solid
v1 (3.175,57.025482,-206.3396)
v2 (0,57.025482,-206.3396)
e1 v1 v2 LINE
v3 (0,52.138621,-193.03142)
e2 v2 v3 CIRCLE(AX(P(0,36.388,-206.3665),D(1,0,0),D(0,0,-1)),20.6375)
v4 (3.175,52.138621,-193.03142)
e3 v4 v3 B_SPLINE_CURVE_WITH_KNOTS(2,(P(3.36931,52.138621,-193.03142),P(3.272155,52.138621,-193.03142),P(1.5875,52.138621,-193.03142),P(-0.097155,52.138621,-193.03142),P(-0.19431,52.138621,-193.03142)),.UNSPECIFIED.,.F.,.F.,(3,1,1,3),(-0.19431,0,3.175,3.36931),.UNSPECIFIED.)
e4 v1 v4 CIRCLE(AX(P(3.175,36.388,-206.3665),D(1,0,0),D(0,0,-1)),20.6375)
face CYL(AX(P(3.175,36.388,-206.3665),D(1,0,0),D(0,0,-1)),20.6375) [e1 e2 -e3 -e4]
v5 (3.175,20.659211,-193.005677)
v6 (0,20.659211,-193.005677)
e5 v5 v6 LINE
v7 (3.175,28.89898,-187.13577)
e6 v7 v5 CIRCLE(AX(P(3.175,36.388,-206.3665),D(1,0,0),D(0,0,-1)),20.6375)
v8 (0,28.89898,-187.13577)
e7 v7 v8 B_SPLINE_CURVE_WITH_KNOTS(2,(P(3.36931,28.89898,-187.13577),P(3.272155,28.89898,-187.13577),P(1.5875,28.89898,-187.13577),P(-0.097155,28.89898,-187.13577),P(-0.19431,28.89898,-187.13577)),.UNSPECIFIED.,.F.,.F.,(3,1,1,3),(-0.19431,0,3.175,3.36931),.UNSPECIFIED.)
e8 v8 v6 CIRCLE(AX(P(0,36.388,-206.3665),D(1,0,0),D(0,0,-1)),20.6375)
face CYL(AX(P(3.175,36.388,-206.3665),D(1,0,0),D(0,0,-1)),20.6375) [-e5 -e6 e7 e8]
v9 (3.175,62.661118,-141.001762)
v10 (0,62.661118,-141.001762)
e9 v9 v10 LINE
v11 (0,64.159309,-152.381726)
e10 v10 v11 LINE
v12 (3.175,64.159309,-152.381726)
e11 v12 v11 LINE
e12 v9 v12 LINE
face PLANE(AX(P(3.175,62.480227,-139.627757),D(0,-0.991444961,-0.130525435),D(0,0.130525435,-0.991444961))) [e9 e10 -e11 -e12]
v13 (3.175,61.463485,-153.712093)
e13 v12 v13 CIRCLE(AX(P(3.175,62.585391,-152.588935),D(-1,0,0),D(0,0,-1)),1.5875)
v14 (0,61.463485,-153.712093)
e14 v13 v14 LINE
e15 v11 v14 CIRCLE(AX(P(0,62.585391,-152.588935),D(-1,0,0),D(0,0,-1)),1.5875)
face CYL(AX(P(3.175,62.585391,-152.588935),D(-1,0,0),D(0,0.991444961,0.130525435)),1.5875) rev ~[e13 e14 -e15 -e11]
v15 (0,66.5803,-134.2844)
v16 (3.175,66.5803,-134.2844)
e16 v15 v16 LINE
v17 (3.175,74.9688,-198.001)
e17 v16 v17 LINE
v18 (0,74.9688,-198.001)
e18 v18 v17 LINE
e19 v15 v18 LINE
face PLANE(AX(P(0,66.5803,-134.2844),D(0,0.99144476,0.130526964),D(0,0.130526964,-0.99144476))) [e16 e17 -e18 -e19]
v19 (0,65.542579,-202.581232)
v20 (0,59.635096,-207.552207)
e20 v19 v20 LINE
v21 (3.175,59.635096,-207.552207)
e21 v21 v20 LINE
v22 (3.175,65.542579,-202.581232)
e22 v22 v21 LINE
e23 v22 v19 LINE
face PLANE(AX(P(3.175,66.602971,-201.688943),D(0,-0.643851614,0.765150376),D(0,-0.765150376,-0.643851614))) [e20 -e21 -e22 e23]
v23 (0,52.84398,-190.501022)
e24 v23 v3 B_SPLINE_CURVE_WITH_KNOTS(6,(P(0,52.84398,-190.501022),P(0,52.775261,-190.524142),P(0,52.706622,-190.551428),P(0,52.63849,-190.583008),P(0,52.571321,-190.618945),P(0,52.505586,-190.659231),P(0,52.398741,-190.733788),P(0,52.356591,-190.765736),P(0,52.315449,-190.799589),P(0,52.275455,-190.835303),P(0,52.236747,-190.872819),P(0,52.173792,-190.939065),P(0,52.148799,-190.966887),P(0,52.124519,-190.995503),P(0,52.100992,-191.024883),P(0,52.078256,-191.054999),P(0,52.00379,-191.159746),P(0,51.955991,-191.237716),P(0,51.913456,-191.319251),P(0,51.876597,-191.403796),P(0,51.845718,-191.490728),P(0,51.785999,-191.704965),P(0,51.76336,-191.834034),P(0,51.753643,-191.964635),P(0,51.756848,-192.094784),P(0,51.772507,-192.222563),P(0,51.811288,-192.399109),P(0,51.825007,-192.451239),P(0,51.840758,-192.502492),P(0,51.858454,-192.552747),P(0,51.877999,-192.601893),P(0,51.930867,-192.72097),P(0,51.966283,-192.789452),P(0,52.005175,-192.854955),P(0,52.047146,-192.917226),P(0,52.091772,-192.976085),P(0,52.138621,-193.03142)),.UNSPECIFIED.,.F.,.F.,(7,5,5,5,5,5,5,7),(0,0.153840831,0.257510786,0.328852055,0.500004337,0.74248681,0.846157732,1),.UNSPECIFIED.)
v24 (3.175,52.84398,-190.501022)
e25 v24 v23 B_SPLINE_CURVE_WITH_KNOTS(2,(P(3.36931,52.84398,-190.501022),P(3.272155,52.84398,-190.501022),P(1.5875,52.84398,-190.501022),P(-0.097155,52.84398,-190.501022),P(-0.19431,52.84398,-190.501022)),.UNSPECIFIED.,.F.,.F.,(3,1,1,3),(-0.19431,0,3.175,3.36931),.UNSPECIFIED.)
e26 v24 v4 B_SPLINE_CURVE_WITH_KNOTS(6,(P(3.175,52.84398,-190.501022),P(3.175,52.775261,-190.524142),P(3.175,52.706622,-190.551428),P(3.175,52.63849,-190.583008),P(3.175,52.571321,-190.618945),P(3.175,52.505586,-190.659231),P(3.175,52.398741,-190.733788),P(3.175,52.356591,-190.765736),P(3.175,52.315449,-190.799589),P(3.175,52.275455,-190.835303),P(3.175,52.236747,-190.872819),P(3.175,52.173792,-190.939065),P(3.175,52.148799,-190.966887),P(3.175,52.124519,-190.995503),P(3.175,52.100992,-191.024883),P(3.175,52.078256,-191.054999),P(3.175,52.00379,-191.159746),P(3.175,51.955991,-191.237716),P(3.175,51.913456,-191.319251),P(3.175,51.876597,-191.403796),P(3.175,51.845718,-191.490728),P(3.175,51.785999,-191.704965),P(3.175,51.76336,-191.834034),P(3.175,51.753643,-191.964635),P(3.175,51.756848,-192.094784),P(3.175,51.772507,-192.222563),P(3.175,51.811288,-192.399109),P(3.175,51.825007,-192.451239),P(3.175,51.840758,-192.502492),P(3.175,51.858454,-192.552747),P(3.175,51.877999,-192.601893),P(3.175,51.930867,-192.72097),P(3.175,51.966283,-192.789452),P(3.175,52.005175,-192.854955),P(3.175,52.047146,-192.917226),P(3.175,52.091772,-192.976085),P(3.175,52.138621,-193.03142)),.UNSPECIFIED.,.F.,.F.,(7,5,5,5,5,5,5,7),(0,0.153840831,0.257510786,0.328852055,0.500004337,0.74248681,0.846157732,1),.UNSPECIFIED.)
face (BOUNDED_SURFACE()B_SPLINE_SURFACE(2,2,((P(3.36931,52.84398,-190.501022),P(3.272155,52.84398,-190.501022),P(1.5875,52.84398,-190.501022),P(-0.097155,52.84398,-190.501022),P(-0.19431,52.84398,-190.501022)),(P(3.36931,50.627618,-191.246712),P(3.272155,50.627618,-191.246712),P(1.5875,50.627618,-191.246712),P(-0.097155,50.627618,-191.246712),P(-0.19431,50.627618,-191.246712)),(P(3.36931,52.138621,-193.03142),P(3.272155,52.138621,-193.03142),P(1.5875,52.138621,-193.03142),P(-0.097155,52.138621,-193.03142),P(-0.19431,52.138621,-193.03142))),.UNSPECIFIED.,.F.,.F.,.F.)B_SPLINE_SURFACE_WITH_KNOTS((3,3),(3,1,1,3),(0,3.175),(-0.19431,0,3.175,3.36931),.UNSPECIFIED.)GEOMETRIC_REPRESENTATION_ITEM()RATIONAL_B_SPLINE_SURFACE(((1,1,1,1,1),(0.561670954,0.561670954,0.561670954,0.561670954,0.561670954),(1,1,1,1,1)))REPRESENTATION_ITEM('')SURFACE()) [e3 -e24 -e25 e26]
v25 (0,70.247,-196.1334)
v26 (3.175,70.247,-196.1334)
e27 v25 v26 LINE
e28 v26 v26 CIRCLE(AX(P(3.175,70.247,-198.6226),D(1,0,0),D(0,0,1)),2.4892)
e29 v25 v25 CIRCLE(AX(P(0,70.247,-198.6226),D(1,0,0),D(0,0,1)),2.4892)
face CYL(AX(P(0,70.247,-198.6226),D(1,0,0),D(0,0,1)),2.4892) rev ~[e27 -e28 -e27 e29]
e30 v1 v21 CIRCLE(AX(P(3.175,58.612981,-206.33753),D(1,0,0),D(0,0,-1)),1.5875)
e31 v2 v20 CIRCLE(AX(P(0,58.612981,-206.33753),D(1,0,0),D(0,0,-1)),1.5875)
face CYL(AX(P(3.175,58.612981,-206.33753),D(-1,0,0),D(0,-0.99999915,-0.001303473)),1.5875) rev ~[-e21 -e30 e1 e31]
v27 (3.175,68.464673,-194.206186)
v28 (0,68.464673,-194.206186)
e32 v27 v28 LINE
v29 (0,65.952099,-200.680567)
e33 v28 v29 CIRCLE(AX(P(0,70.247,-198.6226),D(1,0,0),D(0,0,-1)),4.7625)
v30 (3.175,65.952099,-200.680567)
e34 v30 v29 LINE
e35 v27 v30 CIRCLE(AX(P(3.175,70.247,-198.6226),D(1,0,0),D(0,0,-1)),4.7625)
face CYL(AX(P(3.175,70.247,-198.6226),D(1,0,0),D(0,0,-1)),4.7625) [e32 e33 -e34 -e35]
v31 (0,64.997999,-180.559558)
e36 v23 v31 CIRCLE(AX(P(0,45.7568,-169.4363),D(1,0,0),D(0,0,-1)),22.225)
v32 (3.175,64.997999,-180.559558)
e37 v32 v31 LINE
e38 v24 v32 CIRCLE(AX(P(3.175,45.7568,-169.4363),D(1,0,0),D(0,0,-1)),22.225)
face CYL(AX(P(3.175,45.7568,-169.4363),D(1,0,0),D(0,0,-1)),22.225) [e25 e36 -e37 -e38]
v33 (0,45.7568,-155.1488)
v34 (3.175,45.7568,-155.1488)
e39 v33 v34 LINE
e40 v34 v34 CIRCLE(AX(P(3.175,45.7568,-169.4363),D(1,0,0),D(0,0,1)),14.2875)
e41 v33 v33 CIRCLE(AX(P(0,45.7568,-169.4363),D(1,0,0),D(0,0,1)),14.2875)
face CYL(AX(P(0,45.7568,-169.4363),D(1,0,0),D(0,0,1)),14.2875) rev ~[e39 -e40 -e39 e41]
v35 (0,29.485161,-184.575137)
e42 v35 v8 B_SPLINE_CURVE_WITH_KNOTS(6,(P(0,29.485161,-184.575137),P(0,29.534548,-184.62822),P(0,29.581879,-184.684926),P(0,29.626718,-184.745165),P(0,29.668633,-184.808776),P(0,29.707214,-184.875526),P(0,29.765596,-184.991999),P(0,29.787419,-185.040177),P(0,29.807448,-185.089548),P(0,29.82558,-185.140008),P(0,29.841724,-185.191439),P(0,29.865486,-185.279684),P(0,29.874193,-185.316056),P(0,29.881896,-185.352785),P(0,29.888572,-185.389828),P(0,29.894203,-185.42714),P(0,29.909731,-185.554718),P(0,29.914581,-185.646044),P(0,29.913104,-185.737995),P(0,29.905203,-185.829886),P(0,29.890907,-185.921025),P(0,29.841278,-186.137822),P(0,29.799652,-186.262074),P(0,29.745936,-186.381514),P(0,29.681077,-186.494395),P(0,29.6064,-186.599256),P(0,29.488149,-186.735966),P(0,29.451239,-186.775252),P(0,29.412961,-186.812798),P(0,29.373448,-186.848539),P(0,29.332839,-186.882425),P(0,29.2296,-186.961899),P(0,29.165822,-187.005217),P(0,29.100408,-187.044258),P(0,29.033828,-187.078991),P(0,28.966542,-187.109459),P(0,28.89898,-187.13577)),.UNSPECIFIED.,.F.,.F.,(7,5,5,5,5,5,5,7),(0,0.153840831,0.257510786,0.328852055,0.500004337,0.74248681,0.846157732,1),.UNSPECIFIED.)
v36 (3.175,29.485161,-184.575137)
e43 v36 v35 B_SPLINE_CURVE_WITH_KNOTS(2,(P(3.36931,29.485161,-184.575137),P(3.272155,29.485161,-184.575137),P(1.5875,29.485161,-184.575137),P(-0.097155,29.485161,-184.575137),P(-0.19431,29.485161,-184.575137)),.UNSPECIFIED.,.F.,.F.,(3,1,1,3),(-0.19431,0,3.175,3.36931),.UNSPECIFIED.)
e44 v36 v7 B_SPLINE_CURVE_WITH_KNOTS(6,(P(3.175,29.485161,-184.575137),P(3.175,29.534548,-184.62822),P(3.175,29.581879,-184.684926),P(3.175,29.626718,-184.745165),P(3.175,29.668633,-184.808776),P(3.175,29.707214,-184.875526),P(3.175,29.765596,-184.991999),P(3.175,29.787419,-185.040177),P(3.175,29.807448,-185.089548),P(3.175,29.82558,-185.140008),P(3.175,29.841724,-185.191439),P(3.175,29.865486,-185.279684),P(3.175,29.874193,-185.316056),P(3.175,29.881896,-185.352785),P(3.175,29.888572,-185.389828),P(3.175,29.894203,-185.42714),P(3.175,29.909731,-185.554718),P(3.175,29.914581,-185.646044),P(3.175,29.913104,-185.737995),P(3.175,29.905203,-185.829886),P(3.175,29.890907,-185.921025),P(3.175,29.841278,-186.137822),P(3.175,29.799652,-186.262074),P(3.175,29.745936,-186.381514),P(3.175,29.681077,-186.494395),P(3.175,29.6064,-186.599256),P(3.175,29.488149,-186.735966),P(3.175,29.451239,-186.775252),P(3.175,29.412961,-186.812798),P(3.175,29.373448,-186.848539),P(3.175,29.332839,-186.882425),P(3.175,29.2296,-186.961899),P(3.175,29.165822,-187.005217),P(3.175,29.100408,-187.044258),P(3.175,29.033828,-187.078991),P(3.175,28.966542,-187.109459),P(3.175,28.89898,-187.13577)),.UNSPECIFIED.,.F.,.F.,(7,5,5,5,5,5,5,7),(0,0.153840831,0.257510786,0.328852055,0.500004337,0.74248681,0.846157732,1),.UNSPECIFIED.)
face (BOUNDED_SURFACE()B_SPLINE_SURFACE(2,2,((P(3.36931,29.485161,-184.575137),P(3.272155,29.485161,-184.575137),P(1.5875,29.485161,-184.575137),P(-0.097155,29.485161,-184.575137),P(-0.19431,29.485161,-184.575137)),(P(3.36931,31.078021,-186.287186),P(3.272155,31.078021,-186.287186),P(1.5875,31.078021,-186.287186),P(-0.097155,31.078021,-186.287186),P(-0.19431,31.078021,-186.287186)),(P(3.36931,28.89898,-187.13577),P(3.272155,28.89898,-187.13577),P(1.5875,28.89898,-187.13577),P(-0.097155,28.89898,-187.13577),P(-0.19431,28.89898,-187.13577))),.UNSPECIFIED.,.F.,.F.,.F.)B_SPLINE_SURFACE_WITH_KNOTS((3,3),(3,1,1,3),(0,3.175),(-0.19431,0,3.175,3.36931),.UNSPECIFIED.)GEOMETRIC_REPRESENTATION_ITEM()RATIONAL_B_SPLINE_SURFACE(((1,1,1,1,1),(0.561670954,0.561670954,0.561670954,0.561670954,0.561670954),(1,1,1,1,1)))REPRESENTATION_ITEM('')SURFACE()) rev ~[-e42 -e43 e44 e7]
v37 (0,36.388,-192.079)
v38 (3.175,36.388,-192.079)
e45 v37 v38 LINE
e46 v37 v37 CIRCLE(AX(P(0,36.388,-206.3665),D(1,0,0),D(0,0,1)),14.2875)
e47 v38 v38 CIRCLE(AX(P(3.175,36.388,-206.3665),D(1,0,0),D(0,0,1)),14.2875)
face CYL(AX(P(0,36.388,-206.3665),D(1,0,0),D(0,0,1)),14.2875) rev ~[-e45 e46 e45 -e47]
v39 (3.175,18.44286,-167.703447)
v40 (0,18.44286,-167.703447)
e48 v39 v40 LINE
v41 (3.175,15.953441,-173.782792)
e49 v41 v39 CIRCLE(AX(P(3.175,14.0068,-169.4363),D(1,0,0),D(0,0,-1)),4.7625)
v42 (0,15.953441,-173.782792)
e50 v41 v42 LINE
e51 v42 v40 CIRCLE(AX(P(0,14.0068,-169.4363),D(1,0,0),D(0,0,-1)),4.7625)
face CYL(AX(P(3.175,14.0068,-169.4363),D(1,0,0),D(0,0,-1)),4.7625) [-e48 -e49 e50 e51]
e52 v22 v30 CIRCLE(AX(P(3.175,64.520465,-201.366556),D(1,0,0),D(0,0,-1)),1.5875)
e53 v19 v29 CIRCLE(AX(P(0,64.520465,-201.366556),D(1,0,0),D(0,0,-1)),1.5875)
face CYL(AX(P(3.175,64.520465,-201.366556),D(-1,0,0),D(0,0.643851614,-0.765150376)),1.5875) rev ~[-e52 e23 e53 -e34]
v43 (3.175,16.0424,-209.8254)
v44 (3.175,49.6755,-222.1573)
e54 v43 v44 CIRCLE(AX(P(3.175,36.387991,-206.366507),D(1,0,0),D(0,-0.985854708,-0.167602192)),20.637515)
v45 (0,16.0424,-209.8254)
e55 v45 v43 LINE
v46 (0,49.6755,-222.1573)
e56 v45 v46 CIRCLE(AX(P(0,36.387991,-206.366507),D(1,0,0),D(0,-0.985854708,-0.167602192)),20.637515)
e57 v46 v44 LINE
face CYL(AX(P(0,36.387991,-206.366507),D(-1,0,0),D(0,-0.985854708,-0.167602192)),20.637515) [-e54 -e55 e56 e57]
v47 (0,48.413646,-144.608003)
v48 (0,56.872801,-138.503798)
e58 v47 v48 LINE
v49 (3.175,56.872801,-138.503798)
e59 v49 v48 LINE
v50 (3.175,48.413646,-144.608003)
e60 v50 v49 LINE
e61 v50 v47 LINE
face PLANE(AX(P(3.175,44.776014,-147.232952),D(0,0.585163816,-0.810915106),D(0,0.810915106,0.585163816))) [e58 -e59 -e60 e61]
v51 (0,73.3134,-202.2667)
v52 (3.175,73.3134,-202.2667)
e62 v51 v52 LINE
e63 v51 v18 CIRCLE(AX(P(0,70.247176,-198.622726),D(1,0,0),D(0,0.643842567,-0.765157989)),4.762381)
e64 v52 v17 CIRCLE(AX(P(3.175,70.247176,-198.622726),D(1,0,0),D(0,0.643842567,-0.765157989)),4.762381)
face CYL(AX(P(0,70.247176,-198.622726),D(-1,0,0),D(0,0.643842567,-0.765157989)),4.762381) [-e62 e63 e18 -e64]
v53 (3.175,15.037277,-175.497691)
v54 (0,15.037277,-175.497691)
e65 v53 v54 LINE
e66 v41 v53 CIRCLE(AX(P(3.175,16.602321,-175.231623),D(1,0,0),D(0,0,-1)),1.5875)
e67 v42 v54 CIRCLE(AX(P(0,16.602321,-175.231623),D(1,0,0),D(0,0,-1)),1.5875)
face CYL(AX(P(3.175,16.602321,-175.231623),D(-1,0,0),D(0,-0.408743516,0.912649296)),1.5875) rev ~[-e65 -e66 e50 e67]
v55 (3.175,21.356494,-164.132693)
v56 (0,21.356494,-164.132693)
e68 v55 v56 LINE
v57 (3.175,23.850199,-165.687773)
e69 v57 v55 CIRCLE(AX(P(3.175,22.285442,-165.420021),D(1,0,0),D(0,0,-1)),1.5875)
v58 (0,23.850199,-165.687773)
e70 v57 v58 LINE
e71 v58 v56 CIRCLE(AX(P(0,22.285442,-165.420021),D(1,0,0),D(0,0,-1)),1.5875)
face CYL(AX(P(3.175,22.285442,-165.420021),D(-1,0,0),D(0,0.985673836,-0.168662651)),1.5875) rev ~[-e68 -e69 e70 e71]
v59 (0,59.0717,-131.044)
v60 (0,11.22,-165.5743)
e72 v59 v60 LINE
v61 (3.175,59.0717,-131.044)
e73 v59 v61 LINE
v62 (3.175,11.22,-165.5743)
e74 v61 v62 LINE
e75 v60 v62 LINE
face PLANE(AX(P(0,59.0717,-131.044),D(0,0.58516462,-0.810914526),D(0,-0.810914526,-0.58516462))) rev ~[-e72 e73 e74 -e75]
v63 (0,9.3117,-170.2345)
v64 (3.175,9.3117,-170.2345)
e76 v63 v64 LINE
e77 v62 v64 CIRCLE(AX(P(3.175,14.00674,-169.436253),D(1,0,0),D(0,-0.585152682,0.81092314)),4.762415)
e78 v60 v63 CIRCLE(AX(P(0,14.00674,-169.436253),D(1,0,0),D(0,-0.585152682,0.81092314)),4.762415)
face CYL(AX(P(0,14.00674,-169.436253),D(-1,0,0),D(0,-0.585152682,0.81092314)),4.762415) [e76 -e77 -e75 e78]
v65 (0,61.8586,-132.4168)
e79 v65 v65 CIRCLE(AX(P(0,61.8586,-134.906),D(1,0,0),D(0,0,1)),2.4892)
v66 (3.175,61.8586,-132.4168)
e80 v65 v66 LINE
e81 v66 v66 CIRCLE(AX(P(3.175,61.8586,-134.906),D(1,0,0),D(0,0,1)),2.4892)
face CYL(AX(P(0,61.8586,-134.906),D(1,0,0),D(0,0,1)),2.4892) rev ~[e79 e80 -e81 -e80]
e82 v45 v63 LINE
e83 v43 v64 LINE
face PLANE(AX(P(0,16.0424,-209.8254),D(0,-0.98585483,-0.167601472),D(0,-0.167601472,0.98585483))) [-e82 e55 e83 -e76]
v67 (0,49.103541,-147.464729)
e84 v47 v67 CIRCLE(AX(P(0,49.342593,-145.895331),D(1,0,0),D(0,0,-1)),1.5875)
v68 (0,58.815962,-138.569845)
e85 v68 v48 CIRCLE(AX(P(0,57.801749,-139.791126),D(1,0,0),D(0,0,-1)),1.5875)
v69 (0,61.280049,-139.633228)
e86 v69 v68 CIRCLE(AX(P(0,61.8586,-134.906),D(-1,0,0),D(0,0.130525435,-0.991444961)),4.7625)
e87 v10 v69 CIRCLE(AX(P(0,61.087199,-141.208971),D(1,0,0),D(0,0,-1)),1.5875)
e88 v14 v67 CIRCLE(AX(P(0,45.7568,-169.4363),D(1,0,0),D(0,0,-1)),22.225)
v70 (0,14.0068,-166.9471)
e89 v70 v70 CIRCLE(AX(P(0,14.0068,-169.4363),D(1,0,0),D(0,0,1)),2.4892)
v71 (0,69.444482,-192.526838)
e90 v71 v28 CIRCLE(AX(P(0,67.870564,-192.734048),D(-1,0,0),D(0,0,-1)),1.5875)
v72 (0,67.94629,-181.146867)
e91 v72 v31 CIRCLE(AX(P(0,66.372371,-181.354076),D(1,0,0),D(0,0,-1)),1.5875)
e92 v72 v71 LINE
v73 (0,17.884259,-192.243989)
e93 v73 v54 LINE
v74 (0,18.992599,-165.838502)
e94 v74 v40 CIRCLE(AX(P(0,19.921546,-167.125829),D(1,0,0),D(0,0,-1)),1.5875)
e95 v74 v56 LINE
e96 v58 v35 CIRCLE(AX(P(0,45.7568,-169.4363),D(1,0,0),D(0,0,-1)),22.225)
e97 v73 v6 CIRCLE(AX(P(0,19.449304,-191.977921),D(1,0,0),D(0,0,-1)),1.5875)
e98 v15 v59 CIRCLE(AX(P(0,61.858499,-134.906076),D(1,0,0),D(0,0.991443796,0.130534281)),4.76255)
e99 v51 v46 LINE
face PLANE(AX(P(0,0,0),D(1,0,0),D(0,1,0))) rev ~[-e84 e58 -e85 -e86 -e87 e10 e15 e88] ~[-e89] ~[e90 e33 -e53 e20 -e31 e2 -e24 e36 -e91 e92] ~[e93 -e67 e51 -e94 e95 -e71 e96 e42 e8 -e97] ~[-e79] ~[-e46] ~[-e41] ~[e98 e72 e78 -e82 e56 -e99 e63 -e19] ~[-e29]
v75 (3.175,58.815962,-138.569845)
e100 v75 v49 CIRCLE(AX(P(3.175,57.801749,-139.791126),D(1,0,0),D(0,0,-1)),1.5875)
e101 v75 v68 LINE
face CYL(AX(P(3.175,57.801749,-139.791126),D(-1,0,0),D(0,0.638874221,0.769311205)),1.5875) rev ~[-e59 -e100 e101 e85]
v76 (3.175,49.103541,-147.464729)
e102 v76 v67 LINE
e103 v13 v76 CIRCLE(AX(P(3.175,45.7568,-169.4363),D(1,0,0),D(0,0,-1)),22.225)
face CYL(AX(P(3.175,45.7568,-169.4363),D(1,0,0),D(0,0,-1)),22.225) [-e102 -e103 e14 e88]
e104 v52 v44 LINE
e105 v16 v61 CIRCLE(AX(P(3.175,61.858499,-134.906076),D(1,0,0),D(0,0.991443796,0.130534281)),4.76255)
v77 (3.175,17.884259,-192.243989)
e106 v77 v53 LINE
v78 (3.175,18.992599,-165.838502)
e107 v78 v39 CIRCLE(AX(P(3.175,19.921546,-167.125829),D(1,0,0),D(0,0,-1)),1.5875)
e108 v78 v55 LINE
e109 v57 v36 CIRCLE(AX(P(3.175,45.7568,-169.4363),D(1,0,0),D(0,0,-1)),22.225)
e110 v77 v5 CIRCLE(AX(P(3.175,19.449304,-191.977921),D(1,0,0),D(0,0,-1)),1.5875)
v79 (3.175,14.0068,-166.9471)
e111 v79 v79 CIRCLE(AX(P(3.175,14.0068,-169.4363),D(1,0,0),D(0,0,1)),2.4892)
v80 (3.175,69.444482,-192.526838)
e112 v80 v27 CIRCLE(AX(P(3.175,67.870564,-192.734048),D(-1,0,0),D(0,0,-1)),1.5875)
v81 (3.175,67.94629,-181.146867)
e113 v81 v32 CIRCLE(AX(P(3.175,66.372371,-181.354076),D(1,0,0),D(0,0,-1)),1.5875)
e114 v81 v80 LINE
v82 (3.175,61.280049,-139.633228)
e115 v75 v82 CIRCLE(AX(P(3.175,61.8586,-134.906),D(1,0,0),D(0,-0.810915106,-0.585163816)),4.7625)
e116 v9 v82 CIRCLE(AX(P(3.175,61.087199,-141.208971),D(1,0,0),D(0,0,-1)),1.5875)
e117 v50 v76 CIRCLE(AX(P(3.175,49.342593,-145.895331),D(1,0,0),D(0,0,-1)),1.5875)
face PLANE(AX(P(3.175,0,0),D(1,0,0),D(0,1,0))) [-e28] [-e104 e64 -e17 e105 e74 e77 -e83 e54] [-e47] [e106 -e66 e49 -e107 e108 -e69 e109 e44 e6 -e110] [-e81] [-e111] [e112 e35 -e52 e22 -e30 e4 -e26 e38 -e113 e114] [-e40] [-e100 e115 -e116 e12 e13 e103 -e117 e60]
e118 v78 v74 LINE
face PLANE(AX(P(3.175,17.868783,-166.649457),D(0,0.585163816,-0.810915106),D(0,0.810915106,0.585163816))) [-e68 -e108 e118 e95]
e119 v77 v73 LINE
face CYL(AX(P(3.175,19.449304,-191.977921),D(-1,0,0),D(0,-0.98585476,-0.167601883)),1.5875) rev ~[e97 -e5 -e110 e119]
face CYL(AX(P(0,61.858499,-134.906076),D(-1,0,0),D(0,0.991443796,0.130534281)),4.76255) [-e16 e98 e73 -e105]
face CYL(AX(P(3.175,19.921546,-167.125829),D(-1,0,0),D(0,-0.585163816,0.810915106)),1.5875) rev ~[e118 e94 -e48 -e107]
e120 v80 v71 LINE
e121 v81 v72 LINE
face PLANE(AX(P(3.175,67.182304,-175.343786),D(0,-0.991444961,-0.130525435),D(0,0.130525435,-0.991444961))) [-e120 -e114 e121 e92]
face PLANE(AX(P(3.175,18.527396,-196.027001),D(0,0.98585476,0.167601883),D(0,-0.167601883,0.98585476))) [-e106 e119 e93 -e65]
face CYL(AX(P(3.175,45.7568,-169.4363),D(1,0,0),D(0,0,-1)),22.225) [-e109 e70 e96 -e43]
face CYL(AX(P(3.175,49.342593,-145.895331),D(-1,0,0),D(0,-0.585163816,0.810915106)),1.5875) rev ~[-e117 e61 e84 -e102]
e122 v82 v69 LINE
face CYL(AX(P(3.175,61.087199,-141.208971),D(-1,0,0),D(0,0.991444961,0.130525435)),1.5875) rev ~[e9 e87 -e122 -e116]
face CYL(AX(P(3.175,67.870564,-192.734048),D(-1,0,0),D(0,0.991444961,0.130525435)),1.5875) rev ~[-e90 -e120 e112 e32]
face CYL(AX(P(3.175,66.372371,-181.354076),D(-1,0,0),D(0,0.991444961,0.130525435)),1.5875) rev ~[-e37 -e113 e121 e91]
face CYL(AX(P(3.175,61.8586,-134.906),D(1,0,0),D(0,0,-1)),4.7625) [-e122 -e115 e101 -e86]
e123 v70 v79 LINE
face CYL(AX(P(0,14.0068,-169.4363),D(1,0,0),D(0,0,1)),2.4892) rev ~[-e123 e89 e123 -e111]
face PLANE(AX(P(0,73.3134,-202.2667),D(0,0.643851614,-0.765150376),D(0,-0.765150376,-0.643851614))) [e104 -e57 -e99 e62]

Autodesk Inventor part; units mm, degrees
ref_plane "YZ Plane" through (0, 0, 0) normal (1, 0, 0) x (0, 1, 0)
ref_plane "XZ Plane" through (0, 0, 0) normal (0, 1, 0) x (-1, 0, 0)
ref_plane "XY Plane" through (0, 0, 0) normal (0, 0, 1) x (1, 0, 0)
sketch "Sketch1" plane through (0, 0, 0) normal (1, 0, 0) x (0, 1, 0)
  line L0 (0, -278.2902) -> (0, 46.3817) construction
  line L1 (36.388, -206.3665) -> (0, 0) construction
  arc A0 (16.0424, -209.8254) -> (49.6755, -222.1573) centre (36.388, -206.3665) ccw
  line L2 (61.8586, -134.906) -> (45.7568, -169.4363) construction
  arc A1 (66.5803, -134.2844) -> (59.0717, -131.044) centre (61.8586, -134.906) ccw
  arc A2 (73.3134, -202.2667) -> (74.9688, -198.001) centre (70.247, -198.6226) ccw
  arc A3 (11.22, -165.5743) -> (9.3117, -170.2345) centre (14.0068, -169.4363) ccw
  line L3 (66.5803, -134.2844) -> (74.9688, -198.001)
  line L4 (73.3134, -202.2667) -> (49.6755, -222.1573)
  line L5 (16.0424, -209.8254) -> (9.3117, -170.2345)
  line L6 (70.247, -198.6226) -> (45.7568, -169.4363) construction
  line L7 (59.0717, -131.044) -> (11.22, -165.5743)
  line L8 (45.7568, -169.4363) -> (14.0068, -169.4363) construction
  dimension "d8" = 209.55
  dimension "d9" = 175.506
  dimension "d11" = 10
  dimension "d12" = 20.6375
  dimension "d13" = 38.1
  dimension "d14" = 25
  dimension "d19" = 4.7625
  dimension "d37" = 40
  dimension "d39" = 90
  dimension "d40" = 31.75
  dimension "d41" = 38.1
extrude "Plate1" add sketch "Sketch1" along normal blind 3.175
hole "Hole1" at (0, 61.8586, -134.906) at (0, 14.0068, -169.4363) at (0, 70.247, -198.6226) direction (1, 0, 0) diameter 4.9784 end through all clearance for "Flat Head Machine Screw (82)" size "#10" standard "Ansi Unified Screw Threads"
hole "Hole2" at (0, 36.388, -206.3665) at (0, 45.7568, -169.4363) direction (1, 0, 0) diameter 28.575 end through all
sketch "Sketch2" plane through (3.175, 0, 0) normal (1, 0, 0) x (0, 0, -1)
  circle A0 centre (169.4363, 45.7568) radius 14.2875 projected
  circle A1 centre (206.3665, 36.388) radius 14.2875 projected
  circle A2 centre (198.6226, 70.247) radius 2.4892 projected
  circle A3 centre (169.4363, 14.0068) radius 2.4892 projected
  circle A4 centre (134.906, 61.8586) radius 2.4892 projected
  arc A5 (134.2844, 66.5803) -> (131.044, 59.0717) centre (134.906, 61.8586) ccw projected
  line L0 (165.5743, 11.22) -> (131.044, 59.0717) projected
  arc A6 (165.5743, 11.22) -> (170.2345, 9.3117) centre (169.4363, 14.0068) ccw projected
  line L1 (209.8254, 16.0424) -> (170.2345, 9.3117) projected
  arc A7 (209.8254, 16.0424) -> (222.1573, 49.6755) centre (206.3665, 36.388) ccw projected
  line L2 (202.2667, 73.3134) -> (222.1573, 49.6755) projected
  arc A8 (202.2667, 73.3134) -> (198.001, 74.9688) centre (198.6226, 70.247) ccw projected
  line L3 (134.2844, 66.5803) -> (198.001, 74.9688) projected
  line L4 (134.906, 61.8586) -> (198.6226, 70.247)
  line L5 (198.6226, 70.247) -> (218.5132, 46.6091)
  arc A9 (209.0271, 20.7375) -> (218.5132, 46.6091) centre (206.3665, 36.388) ccw
  line L6 (209.0271, 20.7375) -> (169.4363, 14.0068)
  line L7 (169.4363, 14.0068) -> (134.906, 61.8586)
  circle A10 centre (134.906, 61.8586) radius 4.7625
  circle A11 centre (198.6226, 70.247) radius 4.7625
  circle A12 centre (169.4363, 14.0068) radius 4.7625
  circle A13 centre (169.4363, 45.7568) radius 22.225
  circle A14 centre (206.3665, 36.388) radius 20.6375
  point P0 (0, 0)
  point P1 (196.0269, 18.5274)
  point P2 (186.3547, 31.3444)
  point P3 (161.5078, 24.9941)
  point P4 (166.6495, 17.8688)
  point P5 (174.1315, 14.805)
  point P6 (191.1791, 50.3612)
  point P7 (210.0229, 56.699)
  point P8 (201.689, 66.603)
  point P9 (193.9009, 69.6254)
  point P10 (175.3438, 67.1823)
  point P11 (147.233, 44.776)
  point P12 (158.1848, 64.9233)
  point P13 (139.6278, 62.4802)
  point P14 (137.6928, 57.9966)
  dimension "d42" = 4.7625
  dimension "d44" = 41.275
  dimension "d45" = 44.45
extrude "Cut1" cut sketch "Sketch2" against normal blind 3.175 contours A11 L5 A14 A13 L4 | A13 L7 A10 L4 | A14 L6 A12 L7 A13
fillet "Corner Round1" radius 1.5875 14 edges at (1.5875, 44.776, -147.233) (1.5875, 64.9233, -158.1848) (1.5875, 57.9966, -137.6928) (1.5875, 56.699, -210.0229) (1.5875, 31.3444, -186.3547) (1.5875, 14.805, -174.1315) (1.5875, 18.5274, -196.0269) (1.5875, 50.3612, -191.1791) (1.5875, 62.4802, -139.6278) (1.5875, 69.6254, -193.9009) (1.5875, 66.603, -201.689) (1.5875, 67.1823, -175.3438) (1.5875, 17.8688, -166.6495) (1.5875, 24.9941, -161.5078)
equation "\"d25\" = Thickness"
equation "\"d46\" = Thickness"
equation "\"d7\" = Thickness"
equation "\"BendRadius\" = Thickness"
equation "\"BendReliefWidth\" = Thickness"
equation "\"BendReliefDepth\" = 0.5 * Thickness"
equation "\"CornerReliefSize\" = 4 * Thickness"
equation "\"MinimumRemnant\" = 2 * Thickness"
equation "\"TransitionRadius\" = BendRadius"
equation "\"JacobiRadiusSize\" = BendRadius"
equation "\"GapSize\" = Thickness"
equation "\"Thickness\" = 3.175"
properties part number "PLATE,BEARING,MOUNT" material "Aluminum 3003-H16"
